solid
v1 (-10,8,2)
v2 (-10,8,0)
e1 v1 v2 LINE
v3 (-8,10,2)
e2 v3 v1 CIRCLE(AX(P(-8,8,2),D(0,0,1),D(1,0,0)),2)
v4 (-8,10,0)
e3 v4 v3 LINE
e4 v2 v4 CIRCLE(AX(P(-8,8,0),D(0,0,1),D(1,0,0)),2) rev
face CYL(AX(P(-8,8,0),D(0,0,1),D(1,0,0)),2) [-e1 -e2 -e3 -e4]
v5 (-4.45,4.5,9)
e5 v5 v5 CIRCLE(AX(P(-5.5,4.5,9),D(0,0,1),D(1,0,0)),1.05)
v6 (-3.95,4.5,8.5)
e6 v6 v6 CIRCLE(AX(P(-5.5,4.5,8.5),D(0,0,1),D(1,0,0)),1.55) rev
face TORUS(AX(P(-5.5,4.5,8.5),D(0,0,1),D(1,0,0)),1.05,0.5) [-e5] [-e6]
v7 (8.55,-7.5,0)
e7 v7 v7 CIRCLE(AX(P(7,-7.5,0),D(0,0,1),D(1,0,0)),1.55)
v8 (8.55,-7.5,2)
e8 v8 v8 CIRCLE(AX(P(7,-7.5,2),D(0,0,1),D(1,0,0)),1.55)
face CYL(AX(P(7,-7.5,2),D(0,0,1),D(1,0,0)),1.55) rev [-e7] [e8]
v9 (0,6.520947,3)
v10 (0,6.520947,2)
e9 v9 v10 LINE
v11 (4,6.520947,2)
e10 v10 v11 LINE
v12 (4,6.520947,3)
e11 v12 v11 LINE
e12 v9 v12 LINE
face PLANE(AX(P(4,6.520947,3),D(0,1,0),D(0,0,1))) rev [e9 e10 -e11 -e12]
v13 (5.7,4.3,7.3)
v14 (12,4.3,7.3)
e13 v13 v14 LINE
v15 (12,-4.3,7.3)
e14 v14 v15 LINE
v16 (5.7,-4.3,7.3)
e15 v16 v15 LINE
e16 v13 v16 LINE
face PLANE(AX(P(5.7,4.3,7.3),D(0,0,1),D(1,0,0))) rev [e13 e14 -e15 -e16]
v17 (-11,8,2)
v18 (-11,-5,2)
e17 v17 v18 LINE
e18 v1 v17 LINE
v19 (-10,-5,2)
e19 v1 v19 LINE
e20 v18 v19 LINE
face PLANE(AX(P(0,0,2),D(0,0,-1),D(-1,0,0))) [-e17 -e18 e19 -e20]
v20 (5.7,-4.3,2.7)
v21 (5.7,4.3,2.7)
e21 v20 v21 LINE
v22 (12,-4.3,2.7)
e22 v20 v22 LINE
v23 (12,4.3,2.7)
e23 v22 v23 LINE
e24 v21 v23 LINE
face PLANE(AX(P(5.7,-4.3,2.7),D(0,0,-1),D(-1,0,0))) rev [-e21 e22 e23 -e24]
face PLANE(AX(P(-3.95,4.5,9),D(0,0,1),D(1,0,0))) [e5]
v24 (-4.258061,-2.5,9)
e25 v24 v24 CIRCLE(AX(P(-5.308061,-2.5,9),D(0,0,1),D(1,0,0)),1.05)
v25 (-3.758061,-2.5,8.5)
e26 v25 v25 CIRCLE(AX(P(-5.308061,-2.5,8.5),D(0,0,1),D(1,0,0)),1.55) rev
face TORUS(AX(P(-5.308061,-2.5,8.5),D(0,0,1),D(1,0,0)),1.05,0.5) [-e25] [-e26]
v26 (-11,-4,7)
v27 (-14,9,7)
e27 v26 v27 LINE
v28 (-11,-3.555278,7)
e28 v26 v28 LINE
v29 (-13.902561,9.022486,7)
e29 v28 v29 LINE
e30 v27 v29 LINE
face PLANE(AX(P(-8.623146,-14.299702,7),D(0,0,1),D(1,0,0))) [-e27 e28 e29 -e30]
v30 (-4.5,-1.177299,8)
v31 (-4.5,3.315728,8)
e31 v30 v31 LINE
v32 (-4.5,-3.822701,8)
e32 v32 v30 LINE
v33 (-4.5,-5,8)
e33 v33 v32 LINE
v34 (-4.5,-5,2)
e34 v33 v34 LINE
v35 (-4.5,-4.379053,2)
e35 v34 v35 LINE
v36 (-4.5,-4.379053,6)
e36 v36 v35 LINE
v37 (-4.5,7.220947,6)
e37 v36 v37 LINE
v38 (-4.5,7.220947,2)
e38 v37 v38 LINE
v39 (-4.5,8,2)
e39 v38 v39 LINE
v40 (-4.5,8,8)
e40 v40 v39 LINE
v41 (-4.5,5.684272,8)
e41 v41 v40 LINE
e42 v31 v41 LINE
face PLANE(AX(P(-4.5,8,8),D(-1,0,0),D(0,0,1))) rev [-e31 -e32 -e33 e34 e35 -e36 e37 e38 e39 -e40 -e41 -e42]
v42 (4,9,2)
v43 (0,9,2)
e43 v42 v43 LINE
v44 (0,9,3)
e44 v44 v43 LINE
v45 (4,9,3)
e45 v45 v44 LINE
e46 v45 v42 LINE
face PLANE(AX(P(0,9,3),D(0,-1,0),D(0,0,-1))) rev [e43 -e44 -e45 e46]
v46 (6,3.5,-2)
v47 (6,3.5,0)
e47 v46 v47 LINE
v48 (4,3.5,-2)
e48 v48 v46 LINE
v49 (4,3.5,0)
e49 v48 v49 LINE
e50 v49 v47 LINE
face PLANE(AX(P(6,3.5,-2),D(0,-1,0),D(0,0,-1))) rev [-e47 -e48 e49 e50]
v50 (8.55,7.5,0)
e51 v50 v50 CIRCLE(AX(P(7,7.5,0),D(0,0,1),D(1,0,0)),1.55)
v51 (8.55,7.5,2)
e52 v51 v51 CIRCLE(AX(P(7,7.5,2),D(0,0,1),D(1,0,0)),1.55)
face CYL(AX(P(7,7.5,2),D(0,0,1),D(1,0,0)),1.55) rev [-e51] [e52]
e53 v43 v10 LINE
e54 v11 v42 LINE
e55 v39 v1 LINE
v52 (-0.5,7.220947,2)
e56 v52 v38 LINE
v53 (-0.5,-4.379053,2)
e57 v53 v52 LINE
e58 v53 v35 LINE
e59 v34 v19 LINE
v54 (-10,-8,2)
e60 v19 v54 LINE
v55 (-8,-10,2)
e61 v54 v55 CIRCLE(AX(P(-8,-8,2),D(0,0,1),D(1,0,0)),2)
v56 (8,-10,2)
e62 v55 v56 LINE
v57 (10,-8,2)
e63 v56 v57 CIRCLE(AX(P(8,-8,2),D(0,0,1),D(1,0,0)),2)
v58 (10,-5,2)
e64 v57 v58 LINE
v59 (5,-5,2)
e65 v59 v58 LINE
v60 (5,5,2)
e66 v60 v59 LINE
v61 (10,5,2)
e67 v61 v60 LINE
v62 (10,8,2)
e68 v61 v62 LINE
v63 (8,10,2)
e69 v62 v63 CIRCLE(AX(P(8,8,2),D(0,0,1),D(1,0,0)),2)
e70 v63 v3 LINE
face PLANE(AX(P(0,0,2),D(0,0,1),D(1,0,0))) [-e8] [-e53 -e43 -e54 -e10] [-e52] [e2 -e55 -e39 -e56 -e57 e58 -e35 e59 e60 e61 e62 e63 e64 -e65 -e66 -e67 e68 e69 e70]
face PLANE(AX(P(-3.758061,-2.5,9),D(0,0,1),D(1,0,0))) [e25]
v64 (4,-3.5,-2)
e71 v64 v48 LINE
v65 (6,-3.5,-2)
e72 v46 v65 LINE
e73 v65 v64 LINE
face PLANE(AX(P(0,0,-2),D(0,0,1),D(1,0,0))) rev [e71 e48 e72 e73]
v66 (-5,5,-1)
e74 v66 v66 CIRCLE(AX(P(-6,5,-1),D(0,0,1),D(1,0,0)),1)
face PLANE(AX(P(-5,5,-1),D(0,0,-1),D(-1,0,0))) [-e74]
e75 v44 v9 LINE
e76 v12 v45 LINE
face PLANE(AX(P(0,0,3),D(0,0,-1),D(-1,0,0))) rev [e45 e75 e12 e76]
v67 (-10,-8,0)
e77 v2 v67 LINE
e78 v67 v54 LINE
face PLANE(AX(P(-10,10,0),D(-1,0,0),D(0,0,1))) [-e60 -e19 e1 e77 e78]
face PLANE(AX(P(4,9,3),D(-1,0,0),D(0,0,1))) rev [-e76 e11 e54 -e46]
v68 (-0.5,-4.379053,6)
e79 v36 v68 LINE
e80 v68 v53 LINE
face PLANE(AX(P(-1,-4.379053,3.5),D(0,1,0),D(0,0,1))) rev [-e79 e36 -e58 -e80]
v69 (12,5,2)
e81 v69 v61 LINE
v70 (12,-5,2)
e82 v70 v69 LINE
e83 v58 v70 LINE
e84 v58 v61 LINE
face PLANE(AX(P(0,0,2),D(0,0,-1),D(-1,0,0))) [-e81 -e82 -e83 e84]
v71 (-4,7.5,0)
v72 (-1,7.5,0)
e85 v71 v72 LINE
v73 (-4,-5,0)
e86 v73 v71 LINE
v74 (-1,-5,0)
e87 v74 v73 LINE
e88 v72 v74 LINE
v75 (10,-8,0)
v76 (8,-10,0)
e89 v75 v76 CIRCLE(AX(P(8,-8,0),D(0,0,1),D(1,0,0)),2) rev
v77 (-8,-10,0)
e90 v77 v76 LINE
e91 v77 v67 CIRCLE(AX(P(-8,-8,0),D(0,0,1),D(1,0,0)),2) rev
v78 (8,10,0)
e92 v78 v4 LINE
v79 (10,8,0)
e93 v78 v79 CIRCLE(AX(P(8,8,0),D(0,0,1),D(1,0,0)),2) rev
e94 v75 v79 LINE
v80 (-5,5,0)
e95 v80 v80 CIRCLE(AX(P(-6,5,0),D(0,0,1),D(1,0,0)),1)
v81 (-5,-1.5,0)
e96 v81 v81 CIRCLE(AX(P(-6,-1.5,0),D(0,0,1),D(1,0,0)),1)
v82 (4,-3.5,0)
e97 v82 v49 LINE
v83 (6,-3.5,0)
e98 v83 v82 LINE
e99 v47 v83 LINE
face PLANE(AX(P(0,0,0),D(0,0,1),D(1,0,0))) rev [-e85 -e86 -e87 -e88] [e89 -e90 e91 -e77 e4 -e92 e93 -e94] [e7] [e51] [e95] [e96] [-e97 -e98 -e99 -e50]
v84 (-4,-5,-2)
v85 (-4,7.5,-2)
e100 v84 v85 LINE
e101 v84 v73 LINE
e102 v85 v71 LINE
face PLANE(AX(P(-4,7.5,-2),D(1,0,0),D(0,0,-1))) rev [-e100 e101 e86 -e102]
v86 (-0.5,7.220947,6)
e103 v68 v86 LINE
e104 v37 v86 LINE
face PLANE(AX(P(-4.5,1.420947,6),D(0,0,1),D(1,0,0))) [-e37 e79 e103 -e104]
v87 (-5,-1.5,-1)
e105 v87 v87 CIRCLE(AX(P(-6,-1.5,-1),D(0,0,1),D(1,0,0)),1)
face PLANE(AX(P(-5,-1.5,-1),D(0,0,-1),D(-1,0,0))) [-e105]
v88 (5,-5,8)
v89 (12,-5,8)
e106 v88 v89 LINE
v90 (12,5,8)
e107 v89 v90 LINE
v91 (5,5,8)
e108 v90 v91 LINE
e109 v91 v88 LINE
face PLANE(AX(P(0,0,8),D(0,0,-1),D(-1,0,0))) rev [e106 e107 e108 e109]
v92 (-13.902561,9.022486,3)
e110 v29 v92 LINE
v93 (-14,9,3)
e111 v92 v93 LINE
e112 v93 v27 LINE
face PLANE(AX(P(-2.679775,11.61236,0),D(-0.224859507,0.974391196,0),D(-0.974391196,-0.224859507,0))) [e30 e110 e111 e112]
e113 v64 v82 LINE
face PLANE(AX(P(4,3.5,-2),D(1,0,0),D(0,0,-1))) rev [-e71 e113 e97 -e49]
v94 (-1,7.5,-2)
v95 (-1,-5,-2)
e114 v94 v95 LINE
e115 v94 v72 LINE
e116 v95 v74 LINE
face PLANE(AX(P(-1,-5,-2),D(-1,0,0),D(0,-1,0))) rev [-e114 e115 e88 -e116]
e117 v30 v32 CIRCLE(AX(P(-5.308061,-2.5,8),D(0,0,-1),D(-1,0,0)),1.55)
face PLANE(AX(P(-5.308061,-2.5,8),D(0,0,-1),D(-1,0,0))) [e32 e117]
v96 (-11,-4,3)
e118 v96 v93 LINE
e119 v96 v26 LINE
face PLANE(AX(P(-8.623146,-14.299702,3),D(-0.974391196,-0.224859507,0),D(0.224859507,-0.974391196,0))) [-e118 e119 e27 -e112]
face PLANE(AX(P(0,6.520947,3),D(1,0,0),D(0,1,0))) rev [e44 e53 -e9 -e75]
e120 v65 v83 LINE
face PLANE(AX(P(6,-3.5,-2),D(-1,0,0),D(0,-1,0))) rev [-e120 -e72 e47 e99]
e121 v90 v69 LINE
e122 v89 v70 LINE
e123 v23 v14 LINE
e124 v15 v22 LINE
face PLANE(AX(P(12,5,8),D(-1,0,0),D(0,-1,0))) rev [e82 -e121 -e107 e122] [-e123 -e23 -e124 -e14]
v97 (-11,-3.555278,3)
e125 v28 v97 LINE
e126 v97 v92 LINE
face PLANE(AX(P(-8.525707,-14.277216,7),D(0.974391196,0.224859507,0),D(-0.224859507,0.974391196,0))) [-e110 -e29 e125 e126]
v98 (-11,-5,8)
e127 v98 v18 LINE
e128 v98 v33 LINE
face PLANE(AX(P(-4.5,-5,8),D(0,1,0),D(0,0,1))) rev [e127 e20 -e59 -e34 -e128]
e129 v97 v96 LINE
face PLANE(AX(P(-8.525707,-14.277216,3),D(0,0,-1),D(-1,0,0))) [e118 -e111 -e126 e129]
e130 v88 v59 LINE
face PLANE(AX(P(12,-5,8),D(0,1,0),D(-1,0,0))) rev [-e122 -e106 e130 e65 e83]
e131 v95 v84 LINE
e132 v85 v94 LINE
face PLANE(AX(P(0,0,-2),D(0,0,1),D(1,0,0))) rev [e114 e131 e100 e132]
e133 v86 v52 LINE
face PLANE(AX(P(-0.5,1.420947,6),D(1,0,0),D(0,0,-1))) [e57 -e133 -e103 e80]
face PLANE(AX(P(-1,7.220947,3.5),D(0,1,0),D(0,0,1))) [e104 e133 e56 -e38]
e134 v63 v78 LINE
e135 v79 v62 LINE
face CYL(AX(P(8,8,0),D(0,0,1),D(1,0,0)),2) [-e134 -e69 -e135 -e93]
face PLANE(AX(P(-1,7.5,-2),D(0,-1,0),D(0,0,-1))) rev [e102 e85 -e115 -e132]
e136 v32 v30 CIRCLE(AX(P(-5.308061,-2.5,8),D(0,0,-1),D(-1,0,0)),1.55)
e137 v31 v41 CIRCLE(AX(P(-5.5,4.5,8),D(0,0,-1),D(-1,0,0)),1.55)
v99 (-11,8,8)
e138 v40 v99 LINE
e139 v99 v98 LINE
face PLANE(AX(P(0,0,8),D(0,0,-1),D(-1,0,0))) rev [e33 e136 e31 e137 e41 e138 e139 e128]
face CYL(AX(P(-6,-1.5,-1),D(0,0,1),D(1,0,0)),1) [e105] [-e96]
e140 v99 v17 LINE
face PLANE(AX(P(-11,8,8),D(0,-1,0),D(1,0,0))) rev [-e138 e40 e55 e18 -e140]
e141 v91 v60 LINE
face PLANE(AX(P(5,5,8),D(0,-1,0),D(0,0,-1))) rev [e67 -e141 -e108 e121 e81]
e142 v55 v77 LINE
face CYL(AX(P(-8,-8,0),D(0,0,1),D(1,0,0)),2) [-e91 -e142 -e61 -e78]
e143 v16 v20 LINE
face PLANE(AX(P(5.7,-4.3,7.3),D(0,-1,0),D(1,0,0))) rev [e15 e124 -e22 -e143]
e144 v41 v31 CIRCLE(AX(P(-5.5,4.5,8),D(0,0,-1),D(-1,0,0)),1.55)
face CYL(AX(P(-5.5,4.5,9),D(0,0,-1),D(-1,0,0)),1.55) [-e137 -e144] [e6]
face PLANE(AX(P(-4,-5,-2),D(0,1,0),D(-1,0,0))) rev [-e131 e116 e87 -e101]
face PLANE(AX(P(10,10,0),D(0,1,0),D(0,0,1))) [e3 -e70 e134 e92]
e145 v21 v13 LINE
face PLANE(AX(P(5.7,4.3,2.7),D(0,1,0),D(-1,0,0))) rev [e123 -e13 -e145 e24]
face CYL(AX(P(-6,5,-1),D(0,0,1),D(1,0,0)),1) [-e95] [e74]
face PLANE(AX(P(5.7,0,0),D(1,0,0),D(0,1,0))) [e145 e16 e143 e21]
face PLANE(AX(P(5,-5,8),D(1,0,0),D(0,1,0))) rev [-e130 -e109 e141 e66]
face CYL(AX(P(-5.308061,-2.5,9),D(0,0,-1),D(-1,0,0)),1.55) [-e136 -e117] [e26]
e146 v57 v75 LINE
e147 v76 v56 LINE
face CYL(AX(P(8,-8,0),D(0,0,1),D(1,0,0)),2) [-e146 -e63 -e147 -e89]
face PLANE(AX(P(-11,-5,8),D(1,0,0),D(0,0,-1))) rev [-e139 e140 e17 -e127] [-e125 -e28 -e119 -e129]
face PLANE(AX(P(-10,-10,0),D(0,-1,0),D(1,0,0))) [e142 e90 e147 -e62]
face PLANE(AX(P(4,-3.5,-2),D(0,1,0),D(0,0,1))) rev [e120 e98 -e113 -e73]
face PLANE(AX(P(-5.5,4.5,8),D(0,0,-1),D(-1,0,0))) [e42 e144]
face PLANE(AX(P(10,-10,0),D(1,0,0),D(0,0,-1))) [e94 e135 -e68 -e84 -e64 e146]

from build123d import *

# Parameters (mm, degrees)
SKETCH1_W                  = 20
SKETCH1_H                  = 20
BOSS_EXTRUDE1_DEPTH        = 2
SKETCH2_W                  = 7
SKETCH2_H                  = 10
BOSS_EXTRUDE2_DEPTH        = 6
SKETCH3_W                  = 6.5
SKETCH3_H                  = 13
BOSS_EXTRUDE3_DEPTH        = 6
BOSS_EXTRUDE4_REACH        = 29.324
SKETCH4_W                  = 0.1
SKETCH4_H                  = 4
SKETCH5_W                  = 4
SKETCH5_H                  = 2.479052782
BOSS_EXTRUDE5_DEPTH        = 1
SKETCH6_W                  = 3
SKETCH6_H                  = 12.5
BOSS_EXTRUDE6_DEPTH        = 2
SKETCH7_W                  = 2
SKETCH7_H                  = 7
BOSS_EXTRUDE7_DEPTH        = 2
SKETCH8_W                  = 4.6
SKETCH8_H                  = 8.6
CUT_EXTRUDE1_DEPTH         = 6.3
SKETCH9_W                  = 1
SKETCH9_H                  = 1
SKETCH10_W                 = 1
SKETCH10_H                 = 1
SKETCH11_W                 = 1.55
SKETCH11_H                 = 1
SKETCH12_W                 = 1.55
SKETCH12_H                 = 1
F_3_1_3_1_DIAMETER_HOLE1_D = 3.1
RIB1_START                 = -5.8
RIB1_OUTLINE_W             = 4
RIB1_OUTLINE_H             = 4
RIB1_DEPTH                 = 11.6
FILLET1_R                  = 0.5
FILLET2_R                  = 2


# Read off the part's stored shape, not the designer's step: Rib1
with BuildPart() as part:
    # Sketch1 → Boss-Extrude1 (new body)
    with BuildSketch(Plane.XY.offset(2)):
        Rectangle(SKETCH1_W, SKETCH1_H)
    extrude(amount=-BOSS_EXTRUDE1_DEPTH)

    # Sketch2 → Boss-Extrude2 (add)
    with BuildSketch(Plane.XY.offset(2)):
        with Locations((8.5, 0)):
            Rectangle(SKETCH2_W, SKETCH2_H)
    extrude(amount=BOSS_EXTRUDE2_DEPTH)

    # Sketch3 → Boss-Extrude3 (add)
    with BuildSketch(Plane.XY.offset(2)):
        with Locations((-7.75, 1.5)):
            Rectangle(SKETCH3_W, SKETCH3_H)
    extrude(amount=BOSS_EXTRUDE3_DEPTH)

    # Boss-Extrude4: up to this plane
    boss_extrude4_end = Plane(origin=(-11, -5, 8), z_dir=(1, 0, 0))
    # Sketch4 → Boss-Extrude4 (add, up to the surface)
    with BuildSketch(Plane(origin=(-2.679775281, 11.612359551, 0), x_dir=(-0.9743911956946198, -0.22485950669875843, 0), z_dir=(-0.22485950669875843, 0.9743911956946198, 0)), mode=Mode.PRIVATE) as boss_extrude4_sk1:
        with Locations((11.567741179, 5)):
            Rectangle(SKETCH4_W, SKETCH4_H)
    boss_extrude4_tool1 = split(extrude(boss_extrude4_sk1.sketch, amount=-BOSS_EXTRUDE4_REACH, mode=Mode.PRIVATE), bisect_by=boss_extrude4_end, keep=Keep.BOTH, mode=Mode.PRIVATE)
    add(boss_extrude4_tool1.solids().sort_by_distance((-13.95128, 9.011243, 5))[0])

    # Sketch5 → Boss-Extrude5 (add)
    with BuildSketch(Plane.XY.offset(2)):
        with Locations((2, 7.760473609)):
            Rectangle(SKETCH5_W, SKETCH5_H)
    extrude(amount=BOSS_EXTRUDE5_DEPTH)

    # Sketch6 → Boss-Extrude6 (add)
    with BuildSketch(Plane(origin=(0, 0, 0), x_dir=(-1, 0, 0), z_dir=(0, 0, -1))):
        with Locations((2.5, 1.25)):
            Rectangle(SKETCH6_W, SKETCH6_H)
    extrude(amount=BOSS_EXTRUDE6_DEPTH)

    # Sketch7 → Boss-Extrude7 (add)
    with BuildSketch(Plane(origin=(0, 0, 0), x_dir=(-1, 0, 0), z_dir=(0, 0, -1))):
        with Locations((-5, 0)):
            Rectangle(SKETCH7_W, SKETCH7_H)
    extrude(amount=BOSS_EXTRUDE7_DEPTH)

    # Sketch8 → Cut-Extrude1 (cut)
    with BuildSketch(Plane(origin=(12, 0, 0), x_dir=(0, 0, -1), z_dir=(1, 0, 0))):
        with Locations((-5, 0)):
            Rectangle(SKETCH8_W, SKETCH8_H)
    extrude(amount=-CUT_EXTRUDE1_DEPTH, mode=Mode.SUBTRACT)

    # Sketch9 → Revolve1 (revolve)
    with BuildSketch(Plane(origin=(0, -1.5, 0), x_dir=(1, 0, 0), z_dir=(0, 1, 0))):
        with Locations((-5.5, 0.5)):
            Rectangle(SKETCH9_W, SKETCH9_H)
    revolve(axis=Axis((-6, -1.5, -1), (0, 0, 1)))

    # Sketch10 → Revolve2 (revolve)
    with BuildSketch(Plane(origin=(0, 5, 0), x_dir=(1, 0, 0), z_dir=(0, 1, 0))):
        with Locations((-5.5, 0.5)):
            Rectangle(SKETCH10_W, SKETCH10_H)
    revolve(axis=Axis((-6, 5, -1), (0, 0, 1)))

    # Sketch11 → Revolve3 (revolve)
    with BuildSketch(Plane.XZ.offset(-4.5), mode=Mode.PRIVATE) as revolve3_sk:
        with Locations((-4.725, 8.5)):
            Rectangle(SKETCH11_W, SKETCH11_H)
    revolve(revolve3_sk.sketch.rotate(Axis((-5.5, 4.5, 9), (0, 0, -1)), 180), axis=Axis((-5.5, 4.5, 9), (0, 0, -1)))

    # Sketch12 → Revolve4 (revolve)
    with BuildSketch(Plane.XZ.offset(2.5), mode=Mode.PRIVATE) as revolve4_sk:
        with Locations((-4.533061125, 8.5)):
            Rectangle(SKETCH12_W, SKETCH12_H)
    revolve(revolve4_sk.sketch.rotate(Axis((-5.308061125, -2.5, 9), (0, 0, -1)), 180), axis=Axis((-5.308061125, -2.5, 9), (0, 0, -1)))

    # Ø3.1 (3.1) Diameter Hole1 (through all)
    with Locations(Plane.XY.offset(2)):
        with Locations((7, -7.5), (7, 7.5)):
            Hole(F_3_1_3_1_DIAMETER_HOLE1_D / 2)

    # Rib1 outline → Rib1 (add)
    with BuildSketch(Plane(origin=(0, 1.420947218, 0), x_dir=(1, 0, 0), z_dir=(0, 1, 0)).offset(RIB1_START)):
        with Locations((-2.5, -4)):
            Rectangle(RIB1_OUTLINE_W, RIB1_OUTLINE_H)
    extrude(amount=RIB1_DEPTH)

    # Fillet1
    fillet1_edges = [part.edges().sort_by_distance(p)[0] for p in [
        (-3.95, 4.5, 9),
        (-3.758061125, -2.5, 9),
    ]]
    fillet(fillet1_edges, radius=FILLET1_R)

    # Fillet2
    fillet2_edges = [part.edges().sort_by_distance(p)[0] for p in [
        (10, 10, 1),
        (10, -10, 1),
        (-10, -10, 1),
        (-10, 10, 1),
    ]]
    fillet(fillet2_edges, radius=FILLET2_R)


solid = part.part
